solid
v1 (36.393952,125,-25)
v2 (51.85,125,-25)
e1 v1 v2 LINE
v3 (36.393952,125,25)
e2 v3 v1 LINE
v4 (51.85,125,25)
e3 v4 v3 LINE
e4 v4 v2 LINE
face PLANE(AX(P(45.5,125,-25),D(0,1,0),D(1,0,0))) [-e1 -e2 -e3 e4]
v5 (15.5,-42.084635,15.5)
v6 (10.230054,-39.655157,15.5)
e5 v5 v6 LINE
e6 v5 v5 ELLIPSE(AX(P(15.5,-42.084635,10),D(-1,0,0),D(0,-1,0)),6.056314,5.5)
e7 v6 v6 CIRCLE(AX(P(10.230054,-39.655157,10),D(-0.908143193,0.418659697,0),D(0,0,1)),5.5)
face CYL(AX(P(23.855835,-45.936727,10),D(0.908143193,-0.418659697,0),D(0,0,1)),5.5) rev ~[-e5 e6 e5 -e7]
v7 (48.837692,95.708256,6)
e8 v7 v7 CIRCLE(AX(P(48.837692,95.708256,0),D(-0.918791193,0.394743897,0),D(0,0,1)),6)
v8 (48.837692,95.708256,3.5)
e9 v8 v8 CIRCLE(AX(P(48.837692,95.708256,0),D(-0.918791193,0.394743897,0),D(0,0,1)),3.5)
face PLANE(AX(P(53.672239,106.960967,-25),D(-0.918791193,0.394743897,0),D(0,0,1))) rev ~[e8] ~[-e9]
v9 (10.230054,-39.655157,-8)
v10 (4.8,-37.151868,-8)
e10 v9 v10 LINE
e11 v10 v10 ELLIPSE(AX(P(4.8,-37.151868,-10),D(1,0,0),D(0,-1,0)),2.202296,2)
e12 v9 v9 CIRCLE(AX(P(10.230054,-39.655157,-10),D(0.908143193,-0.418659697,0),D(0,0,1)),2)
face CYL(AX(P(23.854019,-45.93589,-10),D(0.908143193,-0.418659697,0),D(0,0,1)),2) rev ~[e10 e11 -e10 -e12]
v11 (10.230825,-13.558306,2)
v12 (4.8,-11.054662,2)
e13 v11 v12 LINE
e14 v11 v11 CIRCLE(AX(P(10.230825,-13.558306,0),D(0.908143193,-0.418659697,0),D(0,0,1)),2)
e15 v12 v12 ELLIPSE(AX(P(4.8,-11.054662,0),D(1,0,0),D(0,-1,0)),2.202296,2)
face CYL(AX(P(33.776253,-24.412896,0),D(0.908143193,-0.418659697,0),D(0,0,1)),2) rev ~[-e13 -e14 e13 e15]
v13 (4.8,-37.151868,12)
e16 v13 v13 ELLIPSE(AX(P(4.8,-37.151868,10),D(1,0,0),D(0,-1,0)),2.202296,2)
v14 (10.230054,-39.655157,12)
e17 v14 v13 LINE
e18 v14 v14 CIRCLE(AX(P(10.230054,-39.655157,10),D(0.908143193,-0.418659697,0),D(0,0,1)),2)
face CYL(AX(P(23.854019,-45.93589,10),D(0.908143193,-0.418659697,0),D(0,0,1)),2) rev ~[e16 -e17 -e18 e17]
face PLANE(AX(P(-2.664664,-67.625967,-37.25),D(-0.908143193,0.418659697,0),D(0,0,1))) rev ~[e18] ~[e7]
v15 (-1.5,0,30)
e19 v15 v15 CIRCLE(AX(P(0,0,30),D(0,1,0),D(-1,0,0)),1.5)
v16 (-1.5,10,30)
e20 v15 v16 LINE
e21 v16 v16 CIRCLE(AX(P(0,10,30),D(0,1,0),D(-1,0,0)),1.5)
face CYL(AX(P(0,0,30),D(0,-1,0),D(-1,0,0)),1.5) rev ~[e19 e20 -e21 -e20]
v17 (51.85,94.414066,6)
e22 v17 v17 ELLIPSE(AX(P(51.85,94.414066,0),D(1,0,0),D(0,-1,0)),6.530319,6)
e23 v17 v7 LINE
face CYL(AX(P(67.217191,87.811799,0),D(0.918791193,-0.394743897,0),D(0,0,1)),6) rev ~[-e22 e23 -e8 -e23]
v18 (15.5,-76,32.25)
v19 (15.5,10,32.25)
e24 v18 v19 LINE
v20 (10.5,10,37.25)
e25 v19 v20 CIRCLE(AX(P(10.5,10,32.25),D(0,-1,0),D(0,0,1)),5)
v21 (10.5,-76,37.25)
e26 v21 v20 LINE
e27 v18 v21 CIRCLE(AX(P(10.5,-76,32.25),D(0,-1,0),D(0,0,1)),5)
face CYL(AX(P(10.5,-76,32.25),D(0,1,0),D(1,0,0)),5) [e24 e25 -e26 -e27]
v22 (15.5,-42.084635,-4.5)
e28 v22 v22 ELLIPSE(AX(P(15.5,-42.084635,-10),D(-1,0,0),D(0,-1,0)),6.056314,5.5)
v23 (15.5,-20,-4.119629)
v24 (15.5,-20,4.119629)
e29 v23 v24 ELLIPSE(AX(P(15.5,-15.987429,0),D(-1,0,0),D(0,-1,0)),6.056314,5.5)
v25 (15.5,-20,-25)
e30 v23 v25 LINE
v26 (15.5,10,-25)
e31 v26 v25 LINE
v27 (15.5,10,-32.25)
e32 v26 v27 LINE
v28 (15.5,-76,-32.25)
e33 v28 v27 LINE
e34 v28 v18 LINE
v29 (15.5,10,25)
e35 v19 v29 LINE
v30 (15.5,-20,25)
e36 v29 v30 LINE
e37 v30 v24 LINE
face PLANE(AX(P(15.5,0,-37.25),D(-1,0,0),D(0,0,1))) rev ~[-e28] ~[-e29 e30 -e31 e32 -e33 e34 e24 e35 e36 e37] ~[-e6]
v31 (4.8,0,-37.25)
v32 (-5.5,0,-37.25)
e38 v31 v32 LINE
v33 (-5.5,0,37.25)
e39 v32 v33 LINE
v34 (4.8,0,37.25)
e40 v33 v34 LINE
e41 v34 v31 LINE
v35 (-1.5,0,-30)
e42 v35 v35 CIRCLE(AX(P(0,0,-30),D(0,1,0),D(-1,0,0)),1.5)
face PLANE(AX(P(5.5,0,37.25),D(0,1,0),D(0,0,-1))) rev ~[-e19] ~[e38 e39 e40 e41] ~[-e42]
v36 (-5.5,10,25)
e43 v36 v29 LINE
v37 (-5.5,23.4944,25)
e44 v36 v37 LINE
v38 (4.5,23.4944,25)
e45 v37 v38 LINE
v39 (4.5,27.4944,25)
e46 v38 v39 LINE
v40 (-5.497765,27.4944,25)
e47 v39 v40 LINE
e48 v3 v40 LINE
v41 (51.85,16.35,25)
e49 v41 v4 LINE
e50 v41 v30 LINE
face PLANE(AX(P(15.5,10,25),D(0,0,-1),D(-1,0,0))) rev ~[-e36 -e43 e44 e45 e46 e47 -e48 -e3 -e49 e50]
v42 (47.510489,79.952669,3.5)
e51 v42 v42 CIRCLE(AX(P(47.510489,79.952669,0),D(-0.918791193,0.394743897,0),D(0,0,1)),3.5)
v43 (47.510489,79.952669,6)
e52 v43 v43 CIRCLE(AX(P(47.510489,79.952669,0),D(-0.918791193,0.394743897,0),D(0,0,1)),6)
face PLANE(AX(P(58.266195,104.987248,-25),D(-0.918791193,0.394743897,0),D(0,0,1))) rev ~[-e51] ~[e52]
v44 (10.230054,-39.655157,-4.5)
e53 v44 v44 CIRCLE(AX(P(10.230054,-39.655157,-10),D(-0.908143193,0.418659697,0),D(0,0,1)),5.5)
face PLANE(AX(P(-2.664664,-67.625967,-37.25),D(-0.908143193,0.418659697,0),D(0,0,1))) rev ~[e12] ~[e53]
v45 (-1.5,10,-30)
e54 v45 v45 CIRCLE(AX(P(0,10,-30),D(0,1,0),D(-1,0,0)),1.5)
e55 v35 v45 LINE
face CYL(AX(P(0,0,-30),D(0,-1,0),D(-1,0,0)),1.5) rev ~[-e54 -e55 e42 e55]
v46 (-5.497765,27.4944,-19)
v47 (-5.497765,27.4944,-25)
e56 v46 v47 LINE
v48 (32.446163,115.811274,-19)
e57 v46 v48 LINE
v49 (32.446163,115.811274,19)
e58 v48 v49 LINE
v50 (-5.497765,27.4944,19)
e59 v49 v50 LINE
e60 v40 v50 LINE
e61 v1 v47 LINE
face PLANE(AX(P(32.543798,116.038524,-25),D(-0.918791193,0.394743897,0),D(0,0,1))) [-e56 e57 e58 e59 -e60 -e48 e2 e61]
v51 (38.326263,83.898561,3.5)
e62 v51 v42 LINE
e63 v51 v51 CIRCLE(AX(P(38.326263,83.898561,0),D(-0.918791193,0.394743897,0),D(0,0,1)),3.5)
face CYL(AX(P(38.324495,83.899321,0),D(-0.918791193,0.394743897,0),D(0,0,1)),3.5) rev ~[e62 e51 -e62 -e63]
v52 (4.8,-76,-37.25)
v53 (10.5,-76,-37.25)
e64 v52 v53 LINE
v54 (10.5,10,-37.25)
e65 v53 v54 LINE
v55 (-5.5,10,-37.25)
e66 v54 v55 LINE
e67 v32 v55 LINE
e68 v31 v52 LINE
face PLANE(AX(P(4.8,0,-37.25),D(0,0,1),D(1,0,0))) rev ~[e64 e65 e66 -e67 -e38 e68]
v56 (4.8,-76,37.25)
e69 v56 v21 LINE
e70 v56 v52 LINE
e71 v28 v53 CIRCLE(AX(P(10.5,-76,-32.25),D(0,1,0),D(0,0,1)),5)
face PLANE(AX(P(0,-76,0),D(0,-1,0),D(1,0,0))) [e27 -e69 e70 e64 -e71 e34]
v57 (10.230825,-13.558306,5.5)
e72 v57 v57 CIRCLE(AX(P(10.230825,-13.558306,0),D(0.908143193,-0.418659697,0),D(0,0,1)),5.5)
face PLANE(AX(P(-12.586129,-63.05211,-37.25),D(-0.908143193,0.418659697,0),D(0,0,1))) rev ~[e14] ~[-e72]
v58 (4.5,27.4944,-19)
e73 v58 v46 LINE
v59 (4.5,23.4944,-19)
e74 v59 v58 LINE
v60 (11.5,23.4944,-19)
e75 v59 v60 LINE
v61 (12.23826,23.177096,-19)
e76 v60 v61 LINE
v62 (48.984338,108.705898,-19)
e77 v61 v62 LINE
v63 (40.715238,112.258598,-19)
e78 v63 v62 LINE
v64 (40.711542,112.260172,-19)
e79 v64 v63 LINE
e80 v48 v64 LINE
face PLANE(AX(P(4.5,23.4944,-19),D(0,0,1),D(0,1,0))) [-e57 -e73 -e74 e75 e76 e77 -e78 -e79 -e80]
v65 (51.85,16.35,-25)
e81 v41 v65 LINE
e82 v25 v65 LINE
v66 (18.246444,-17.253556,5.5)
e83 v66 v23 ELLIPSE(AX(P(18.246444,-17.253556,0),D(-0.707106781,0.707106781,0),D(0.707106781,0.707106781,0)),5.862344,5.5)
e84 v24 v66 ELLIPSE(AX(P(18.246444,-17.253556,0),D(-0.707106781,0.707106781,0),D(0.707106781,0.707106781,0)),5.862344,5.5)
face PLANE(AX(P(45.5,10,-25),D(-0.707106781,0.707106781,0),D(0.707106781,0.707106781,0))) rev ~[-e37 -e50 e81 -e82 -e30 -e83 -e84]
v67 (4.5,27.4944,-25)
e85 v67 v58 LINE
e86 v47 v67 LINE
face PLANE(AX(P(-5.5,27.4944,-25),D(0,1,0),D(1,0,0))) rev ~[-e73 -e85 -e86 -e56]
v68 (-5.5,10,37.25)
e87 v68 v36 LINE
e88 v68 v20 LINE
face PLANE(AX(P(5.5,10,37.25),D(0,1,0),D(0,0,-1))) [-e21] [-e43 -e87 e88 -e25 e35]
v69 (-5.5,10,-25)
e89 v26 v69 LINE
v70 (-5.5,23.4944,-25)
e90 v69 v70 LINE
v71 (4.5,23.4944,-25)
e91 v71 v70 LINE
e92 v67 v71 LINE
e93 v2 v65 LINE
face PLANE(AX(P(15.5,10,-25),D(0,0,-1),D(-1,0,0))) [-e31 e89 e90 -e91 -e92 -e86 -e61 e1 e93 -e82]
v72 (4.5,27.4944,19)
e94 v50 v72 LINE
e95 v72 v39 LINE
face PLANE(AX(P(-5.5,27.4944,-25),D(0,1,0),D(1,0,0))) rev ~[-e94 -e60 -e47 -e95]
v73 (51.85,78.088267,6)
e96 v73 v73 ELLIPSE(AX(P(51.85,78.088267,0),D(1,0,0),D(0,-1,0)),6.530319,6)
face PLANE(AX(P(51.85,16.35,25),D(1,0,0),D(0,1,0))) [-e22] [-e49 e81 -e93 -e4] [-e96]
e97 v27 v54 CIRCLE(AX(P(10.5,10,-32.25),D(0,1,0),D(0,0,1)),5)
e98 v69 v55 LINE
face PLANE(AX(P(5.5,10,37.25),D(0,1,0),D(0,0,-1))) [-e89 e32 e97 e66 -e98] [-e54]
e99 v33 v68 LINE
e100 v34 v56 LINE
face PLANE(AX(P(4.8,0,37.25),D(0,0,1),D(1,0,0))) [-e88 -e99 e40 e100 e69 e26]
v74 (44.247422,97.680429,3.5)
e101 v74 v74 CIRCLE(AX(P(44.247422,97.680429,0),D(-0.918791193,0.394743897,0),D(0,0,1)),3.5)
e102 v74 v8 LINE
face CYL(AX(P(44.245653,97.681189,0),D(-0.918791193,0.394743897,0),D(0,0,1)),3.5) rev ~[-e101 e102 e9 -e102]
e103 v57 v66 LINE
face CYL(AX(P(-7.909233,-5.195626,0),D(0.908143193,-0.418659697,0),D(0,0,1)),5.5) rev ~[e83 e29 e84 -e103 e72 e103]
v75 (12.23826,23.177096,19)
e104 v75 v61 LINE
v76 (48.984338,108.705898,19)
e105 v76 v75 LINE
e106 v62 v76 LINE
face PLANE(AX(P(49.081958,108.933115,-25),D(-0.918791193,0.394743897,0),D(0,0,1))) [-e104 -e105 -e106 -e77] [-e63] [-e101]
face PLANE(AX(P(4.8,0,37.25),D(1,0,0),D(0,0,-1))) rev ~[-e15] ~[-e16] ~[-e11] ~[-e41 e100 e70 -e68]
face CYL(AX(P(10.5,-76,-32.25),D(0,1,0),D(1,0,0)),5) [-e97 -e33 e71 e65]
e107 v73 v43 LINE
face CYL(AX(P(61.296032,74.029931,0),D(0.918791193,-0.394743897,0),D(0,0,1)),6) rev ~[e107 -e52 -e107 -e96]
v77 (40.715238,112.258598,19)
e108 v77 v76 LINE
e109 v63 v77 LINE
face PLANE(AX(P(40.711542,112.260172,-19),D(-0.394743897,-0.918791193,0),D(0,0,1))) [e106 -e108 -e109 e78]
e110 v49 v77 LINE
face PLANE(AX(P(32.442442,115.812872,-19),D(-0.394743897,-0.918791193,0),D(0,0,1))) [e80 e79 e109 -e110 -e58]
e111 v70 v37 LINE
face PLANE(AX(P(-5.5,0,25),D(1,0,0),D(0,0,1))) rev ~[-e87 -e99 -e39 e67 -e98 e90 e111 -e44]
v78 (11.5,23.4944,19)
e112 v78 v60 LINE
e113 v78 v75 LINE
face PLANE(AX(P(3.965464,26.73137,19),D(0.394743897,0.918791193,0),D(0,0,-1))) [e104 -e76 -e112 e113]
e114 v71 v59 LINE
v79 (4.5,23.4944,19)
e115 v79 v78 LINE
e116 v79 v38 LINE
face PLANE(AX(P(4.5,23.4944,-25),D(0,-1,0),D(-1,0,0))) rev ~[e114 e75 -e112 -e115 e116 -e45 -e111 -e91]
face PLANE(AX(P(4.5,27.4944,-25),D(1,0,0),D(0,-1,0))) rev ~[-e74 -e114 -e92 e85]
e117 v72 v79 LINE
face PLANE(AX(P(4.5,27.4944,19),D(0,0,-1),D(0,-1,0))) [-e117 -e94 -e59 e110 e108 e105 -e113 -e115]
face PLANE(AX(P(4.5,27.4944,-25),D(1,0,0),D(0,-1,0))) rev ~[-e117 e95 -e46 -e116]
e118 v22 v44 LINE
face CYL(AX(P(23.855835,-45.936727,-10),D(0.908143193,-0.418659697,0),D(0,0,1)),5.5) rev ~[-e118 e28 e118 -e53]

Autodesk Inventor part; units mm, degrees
sketch "Sketch1" plane through (0, 0, 0) normal (0, 1, 0) x (-1, 0, 0)
  line L0 (5.5, 37.25) -> (-5.5, 37.25)
  line L1 (-5.5, 37.25) -> (-5.5, -37.25)
  line L2 (-5.5, -37.25) -> (5.5, -37.25)
  line L3 (5.5, -37.25) -> (5.5, 37.25)
  line L4 (5.5, 37.25) -> (-5.5, -37.25) construction
  line L5 (-5.5, 37.25) -> (5.5, -37.25) construction
  circle A0 centre (0, 30) radius 1.5
  line L6 (5.5, 0) -> (-5.5, 0)
  circle A1 centre (0, -30) radius 1.5
  line L7 (-5.5, -25) -> (5.5, -25)
  line L8 (5.5, -25) -> (5.5, 25)
  line L9 (5.5, 25) -> (-5.5, 25)
  line L10 (-5.5, 25) -> (-5.5, -25)
  line L11 (-5.5, -25) -> (5.5, 25) construction
  line L12 (5.5, -25) -> (-5.5, 25) construction
  point P0 (0, 0)
  dimension "d0" = 11
  dimension "d1" = 74.5
  dimension "d2" = 3
  dimension "d3" = 7.25
  dimension "d28" = 50
extrude "Extrusion1" add sketch "Sketch1" along normal blind 10
sketch "Sketch2" plane through (5.5, 0, 37.25) normal (1, 0, 0) x (0, 0, -1)
  line L0 (0, 10) -> (74.5, 10) projected
  line L1 (0, 0) -> (74.5, 0) projected
  line L2 (0, 10) -> (74.5, 10)
  line L3 (74.5, 10) -> (74.5, 0)
  line L4 (74.5, 0) -> (0, 0)
  line L5 (0, 0) -> (0, 10)
  point P0 (37.25, 0)
extrude "Extrusion2" add sketch "Sketch2" along normal blind 10
sketch "Sketch3" plane through (0, 0, 0) normal (0, -1, 0) x (1, 0, 0)
  line L0 (-5.5, 37.25) -> (15.5, 37.25) projected
  line L1 (-5.5, -37.25) -> (15.5, -37.25) projected
  line L2 (15.5, 37.25) -> (4.8, 37.25)
  line L3 (4.8, 37.25) -> (4.8, -37.25)
  line L4 (4.8, -37.25) -> (15.5, -37.25)
  line L5 (15.5, -37.25) -> (15.5, 37.25)
  point P0 (0, 0)
  dimension "d9" = 10.7
extrude "Extrusion3" add sketch "Sketch3" along normal blind 76
ref_plane "Work Plane1" through (15.5, -76, -37.25) normal (-0.9081432, 0.4186597, 0) x (0, 0, 1)
ref_plane "Work Plane3" through (10.9593, -73.9067, -37.25) normal (-0.9081432, 0.4186597, 0) x (0, 0, 1)
sketch "Sketch4" plane through (10.9593, -73.9067, -37.25) normal (-0.9081432, 0.4186597, 0) x (0, 0, 1)
  circle A0 centre (37.25, 54.5) radius 2
  circle A1 centre (37.25, 54.5) radius 5.5
  circle A2 centre (27.25, 30.8) radius 2
  circle A3 centre (27.25, 30.8) radius 5.5
  line L0 (37.25, 62.5297) -> (37.25, 0)
  line L1 (0, 0) -> (74.5, 0) projected
  circle A4 centre (47.25, 30.8) radius 5.5
  circle A5 centre (47.25, 30.8) radius 2
  point P0 (37.25, 0)
  dimension "d13" = 4
  dimension "d14" = 11
  dimension "d15" = 4
  dimension "d16" = 11
  dimension "d19" = 10
  dimension "d20" = 23.7
  dimension "d23" = 54.5
extrude "Extrusion4" cut sketch "Sketch4" along normal blind 15 contours A0 L0 | A0 L0 A1 | L0 A0 | A0 L0 A1 | A2 | A3 | A4 | A5
extrude "Extrusion11" cut sketch "Sketch4" along normal blind 25.925 contours A0 L0 | A0 L0 A1 | L0 A0 | A0 L0 A1
extrude "Extrusion6" cut sketch "Sketch4" along normal through all contours A0 L0 | L0 A0 | A2 | A5
extrude "Extrusion7" add sketch "Sketch1" along normal blind 125 contours L3 L6 L1 L9 | L3 L7 L1 L6
sketch "Sketch5" plane through (5.5, 10, -25) normal (1, 0, 0) x (0, 0, -1)
  line L0 (0, 0) -> (0, 115) projected
  line L1 (0, 115) -> (0, 0)
  line L2 (0, 0) -> (-50, 0)
  line L3 (-50, 0) -> (-50, 115)
  line L4 (0, 115) -> (-50, 115)
  point P0 (-25, -10)
extrude "Extrusion8" add sketch "Sketch5" along normal blind 40
chamfer "Chamfer1" distance 40 angle 23.25 1 edges at (-5.5, 125, 0) measured on face at (-5.5, 48.3333, -8.3333)
chamfer "Chamfer2" distance 30 distance2 30 1 edges at (15.5, 10, 0)
sketch "Sketch8" plane through (11.6854, 125, -25) normal (-0.9187912, 0.3947439, 0) x (0, 0, 1)
  line L0 (0, 0) -> (0, 13.3481) projected
  line L1 (-12.25, -121.6327) -> (62.25, -121.6327) projected
  line L2 (0, 13.3481) -> (50, 13.3481)
  line L3 (50, 13.3481) -> (50, -121.6327)
  line L4 (50, -121.6327) -> (0, -121.6327)
  line L5 (0, -121.6327) -> (0, 13.3481)
  point P0 (25, -119.4616)
  point P1 (0, 0)
  dimension "d59" = 50
extrude "Extrusion12" cut sketch "Sketch8" against normal blind 22.7
ref_plane "Work Plane4" through (64.6996, 102.2233, -25) normal (-0.9187912, 0.3947439, 0) x (0, 0, 1)
ref_plane "Work Plane5" through (32.5419, 116.0393, -25) normal (-0.9187912, 0.3947439, 0) x (0, 0, 1)
ref_plane "Work Plane6" through (-5.5, 27.4944, -18.625) normal (0.3947439, 0.9187912, 0) x (0, 0, -1)
sketch "Sketch11" plane through (15.5, 10, -25) normal (0, 0, -1) x (-1, 0, 0)
  line L0 (21, 17.4944) -> (-6.8294, 82.2691) projected
  line L1 (21, 17.4944) -> (11, 17.4944)
  line L2 (11, 17.4944) -> (11, 13.4944)
  line L3 (11, 13.4944) -> (21, 13.4944)
  line L4 (21, 13.4944) -> (21, 17.4944)
  point P0 (15.5, -10)
  dimension "d76" = 10
  dimension "d77" = 4
extrude "Extrusion15" cut sketch "Sketch11" against normal blind 70.5
fillet "Fillet1" radius 5 2 edges at (15.5, -33, 37.25) (15.5, -33, -37.25)
sketch "Sketch12" plane through (32.5419, 116.0393, -25) normal (-0.9187912, 0.3947439, 0) x (0, 0, 1)
  line L0 (6, -0.2473) -> (44, -0.2473)
  line L1 (44, -0.2473) -> (44, -96.0989)
  line L2 (6, -96.0989) -> (6, -0.2473)
  line L3 (0, -96.3711) -> (0, 9.7527) projected
  line L4 (50, 9.7527) -> (50, -96.3711) projected
  line L5 (0, 9.7527) -> (50, 9.7527) projected
  line L6 (44, -96.0989) -> (44, -96.8375)
  line L7 (44, -96.8375) -> (6, -96.8375)
  line L8 (6, -96.8375) -> (6, -96.0989)
  point P0 (25, -119.4616)
  dimension "d81" = 6
  dimension "d82" = 6
  dimension "d83" = 10
extrude "Extrusion16" cut sketch "Sketch12" against normal blind 9
sketch "Sketch14" plane through (4.5, 23.4944, -25) normal (-1, 0, 0) x (0, 0, 1)
  line L0 (6, 4) -> (6, 92.3177) projected
  line L1 (6, 4) -> (44, 4)
  line L2 (44, 4) -> (44, 0)
  line L3 (44, 0) -> (6, 0)
  line L4 (6, 0) -> (6, 4)
  point P0 (25, -23.4944)
  point P1 (6, 19)
extrude "Extrusion18" cut sketch "Sketch14" against normal blind 7
sketch "Sketch15" plane through (15.5, 10, -25) normal (0, 0, -1) x (-1, 0, 0)
  line L0 (-30, 115) -> (-39.6875, 115)
  line L1 (-39.6875, 115) -> (-39.6875, 9.6875)
  line L2 (-30, 0) -> (-39.6875, 9.6875)
  line L3 (0, -30) -> (-30, 0) projected
  line L4 (21, 13.4944) -> (11, 13.4944) projected
  line L5 (11, 13.4944) -> (11, 17.4944) projected
  line L6 (11, 17.4944) -> (21, 17.4944) projected
  line L7 (21, 17.4944) -> (-20.8917, 115) construction
  line L8 (-20.8917, 115) -> (-30, 115) projected
  line L9 (-30, 0) -> (-30, 115) projected
  line L10 (0, -30) -> (-30, 0) projected
  line L11 (0, 0) -> (0, -30) projected
  line L12 (21, 0) -> (0, 0) projected
  line L13 (21, 0) -> (21, 13.4944) projected
  point P0 (15.5, -10)
  dimension "d91" = 135
extrude "Extrusion19" add sketch "Sketch15" against normal blind 50
sketch "Sketch16" plane through (40.811, 112.4866, -25) normal (-0.9187912, 0.3947439, 0) x (0, 0, 1)
  line L0 (6, -96.3711) -> (6, -0.2473) projected
  line L1 (44, -93.3357) -> (6, -93.3357) projected
  line L2 (6, -0.2473) -> (44, -0.2473)
  line L3 (44, -0.2473) -> (44, -93.3357)
  line L4 (44, -93.3357) -> (6, -93.3357)
  line L5 (6, -93.3357) -> (6, -0.2473)
  point P0 (25, -119.4616)
extrude "Extrusion20" cut sketch "Sketch16" against normal blind 9
sketch "Sketch18" plane through (49.0802, 108.9339, -25) normal (-0.9187912, 0.3947439, 0) x (0, 0, 1)
  line L0 (6, -0.2473) -> (44, -0.2473) construction
  line L1 (25, -0.2473) -> (25, -12.2473) construction
  line L2 (6, -93.3357) -> (6, -0.2473) construction
  line L3 (44, -0.2473) -> (44, -93.3357) construction
  circle A0 centre (25, -12.2473) radius 3.5
  circle A1 centre (25, -27.2473) radius 3.5
  point P0 (25, -119.4616)
  dimension "d99" = 12
  dimension "d100" = 19
  dimension "d103" = 7
  dimension "d104" = 7
  dimension "d105" = 15
extrude "Extrusion22" cut sketch "Sketch18" against normal through all
ref_plane "Work Plane8" through (72.0499, 99.0653, -25) normal (-0.9187912, 0.3947439, 0) x (0, 0, 1)
sketch "Sketch19" plane through (72.0499, 99.0653, -25) normal (-0.9187912, 0.3947439, 0) x (0, 0, 1)
  circle A0 centre (25, -12.2473) radius 3.5 projected
  circle A1 centre (25, -12.2473) radius 6
  circle A2 centre (25, -27.2473) radius 3.5 projected
  circle A3 centre (25, -27.2473) radius 6
  point P0 (25, -119.4616)
  dimension "d109" = 12
  dimension "d110" = 12
extrude "Extrusion23" cut sketch "Sketch19" along normal blind 15 contours A3
extrude "Extrusion24" cut sketch "Sketch19" along normal blind 20 contours A1
sketch "Sketch20" plane through (-5.5, 10, 25) normal (0, 0, 1) x (1, 0, 0)
  line L0 (21, -30) -> (60.6875, 9.6875) projected
  line L1 (57.35, 6.35) -> (57.35, 115)
  line L2 (41.8917, 115) -> (60.6875, 115) projected
  line L3 (57.35, 115) -> (87.3125, 115)
  line L4 (87.3125, 115) -> (90.4875, 6.35)
  line L5 (90.4875, 6.35) -> (57.35, 6.35)
  point P0 (5.5, -10)
extrude "Extrusion25" cut sketch "Sketch20" against normal through all
properties part number "Camera Bracket"
